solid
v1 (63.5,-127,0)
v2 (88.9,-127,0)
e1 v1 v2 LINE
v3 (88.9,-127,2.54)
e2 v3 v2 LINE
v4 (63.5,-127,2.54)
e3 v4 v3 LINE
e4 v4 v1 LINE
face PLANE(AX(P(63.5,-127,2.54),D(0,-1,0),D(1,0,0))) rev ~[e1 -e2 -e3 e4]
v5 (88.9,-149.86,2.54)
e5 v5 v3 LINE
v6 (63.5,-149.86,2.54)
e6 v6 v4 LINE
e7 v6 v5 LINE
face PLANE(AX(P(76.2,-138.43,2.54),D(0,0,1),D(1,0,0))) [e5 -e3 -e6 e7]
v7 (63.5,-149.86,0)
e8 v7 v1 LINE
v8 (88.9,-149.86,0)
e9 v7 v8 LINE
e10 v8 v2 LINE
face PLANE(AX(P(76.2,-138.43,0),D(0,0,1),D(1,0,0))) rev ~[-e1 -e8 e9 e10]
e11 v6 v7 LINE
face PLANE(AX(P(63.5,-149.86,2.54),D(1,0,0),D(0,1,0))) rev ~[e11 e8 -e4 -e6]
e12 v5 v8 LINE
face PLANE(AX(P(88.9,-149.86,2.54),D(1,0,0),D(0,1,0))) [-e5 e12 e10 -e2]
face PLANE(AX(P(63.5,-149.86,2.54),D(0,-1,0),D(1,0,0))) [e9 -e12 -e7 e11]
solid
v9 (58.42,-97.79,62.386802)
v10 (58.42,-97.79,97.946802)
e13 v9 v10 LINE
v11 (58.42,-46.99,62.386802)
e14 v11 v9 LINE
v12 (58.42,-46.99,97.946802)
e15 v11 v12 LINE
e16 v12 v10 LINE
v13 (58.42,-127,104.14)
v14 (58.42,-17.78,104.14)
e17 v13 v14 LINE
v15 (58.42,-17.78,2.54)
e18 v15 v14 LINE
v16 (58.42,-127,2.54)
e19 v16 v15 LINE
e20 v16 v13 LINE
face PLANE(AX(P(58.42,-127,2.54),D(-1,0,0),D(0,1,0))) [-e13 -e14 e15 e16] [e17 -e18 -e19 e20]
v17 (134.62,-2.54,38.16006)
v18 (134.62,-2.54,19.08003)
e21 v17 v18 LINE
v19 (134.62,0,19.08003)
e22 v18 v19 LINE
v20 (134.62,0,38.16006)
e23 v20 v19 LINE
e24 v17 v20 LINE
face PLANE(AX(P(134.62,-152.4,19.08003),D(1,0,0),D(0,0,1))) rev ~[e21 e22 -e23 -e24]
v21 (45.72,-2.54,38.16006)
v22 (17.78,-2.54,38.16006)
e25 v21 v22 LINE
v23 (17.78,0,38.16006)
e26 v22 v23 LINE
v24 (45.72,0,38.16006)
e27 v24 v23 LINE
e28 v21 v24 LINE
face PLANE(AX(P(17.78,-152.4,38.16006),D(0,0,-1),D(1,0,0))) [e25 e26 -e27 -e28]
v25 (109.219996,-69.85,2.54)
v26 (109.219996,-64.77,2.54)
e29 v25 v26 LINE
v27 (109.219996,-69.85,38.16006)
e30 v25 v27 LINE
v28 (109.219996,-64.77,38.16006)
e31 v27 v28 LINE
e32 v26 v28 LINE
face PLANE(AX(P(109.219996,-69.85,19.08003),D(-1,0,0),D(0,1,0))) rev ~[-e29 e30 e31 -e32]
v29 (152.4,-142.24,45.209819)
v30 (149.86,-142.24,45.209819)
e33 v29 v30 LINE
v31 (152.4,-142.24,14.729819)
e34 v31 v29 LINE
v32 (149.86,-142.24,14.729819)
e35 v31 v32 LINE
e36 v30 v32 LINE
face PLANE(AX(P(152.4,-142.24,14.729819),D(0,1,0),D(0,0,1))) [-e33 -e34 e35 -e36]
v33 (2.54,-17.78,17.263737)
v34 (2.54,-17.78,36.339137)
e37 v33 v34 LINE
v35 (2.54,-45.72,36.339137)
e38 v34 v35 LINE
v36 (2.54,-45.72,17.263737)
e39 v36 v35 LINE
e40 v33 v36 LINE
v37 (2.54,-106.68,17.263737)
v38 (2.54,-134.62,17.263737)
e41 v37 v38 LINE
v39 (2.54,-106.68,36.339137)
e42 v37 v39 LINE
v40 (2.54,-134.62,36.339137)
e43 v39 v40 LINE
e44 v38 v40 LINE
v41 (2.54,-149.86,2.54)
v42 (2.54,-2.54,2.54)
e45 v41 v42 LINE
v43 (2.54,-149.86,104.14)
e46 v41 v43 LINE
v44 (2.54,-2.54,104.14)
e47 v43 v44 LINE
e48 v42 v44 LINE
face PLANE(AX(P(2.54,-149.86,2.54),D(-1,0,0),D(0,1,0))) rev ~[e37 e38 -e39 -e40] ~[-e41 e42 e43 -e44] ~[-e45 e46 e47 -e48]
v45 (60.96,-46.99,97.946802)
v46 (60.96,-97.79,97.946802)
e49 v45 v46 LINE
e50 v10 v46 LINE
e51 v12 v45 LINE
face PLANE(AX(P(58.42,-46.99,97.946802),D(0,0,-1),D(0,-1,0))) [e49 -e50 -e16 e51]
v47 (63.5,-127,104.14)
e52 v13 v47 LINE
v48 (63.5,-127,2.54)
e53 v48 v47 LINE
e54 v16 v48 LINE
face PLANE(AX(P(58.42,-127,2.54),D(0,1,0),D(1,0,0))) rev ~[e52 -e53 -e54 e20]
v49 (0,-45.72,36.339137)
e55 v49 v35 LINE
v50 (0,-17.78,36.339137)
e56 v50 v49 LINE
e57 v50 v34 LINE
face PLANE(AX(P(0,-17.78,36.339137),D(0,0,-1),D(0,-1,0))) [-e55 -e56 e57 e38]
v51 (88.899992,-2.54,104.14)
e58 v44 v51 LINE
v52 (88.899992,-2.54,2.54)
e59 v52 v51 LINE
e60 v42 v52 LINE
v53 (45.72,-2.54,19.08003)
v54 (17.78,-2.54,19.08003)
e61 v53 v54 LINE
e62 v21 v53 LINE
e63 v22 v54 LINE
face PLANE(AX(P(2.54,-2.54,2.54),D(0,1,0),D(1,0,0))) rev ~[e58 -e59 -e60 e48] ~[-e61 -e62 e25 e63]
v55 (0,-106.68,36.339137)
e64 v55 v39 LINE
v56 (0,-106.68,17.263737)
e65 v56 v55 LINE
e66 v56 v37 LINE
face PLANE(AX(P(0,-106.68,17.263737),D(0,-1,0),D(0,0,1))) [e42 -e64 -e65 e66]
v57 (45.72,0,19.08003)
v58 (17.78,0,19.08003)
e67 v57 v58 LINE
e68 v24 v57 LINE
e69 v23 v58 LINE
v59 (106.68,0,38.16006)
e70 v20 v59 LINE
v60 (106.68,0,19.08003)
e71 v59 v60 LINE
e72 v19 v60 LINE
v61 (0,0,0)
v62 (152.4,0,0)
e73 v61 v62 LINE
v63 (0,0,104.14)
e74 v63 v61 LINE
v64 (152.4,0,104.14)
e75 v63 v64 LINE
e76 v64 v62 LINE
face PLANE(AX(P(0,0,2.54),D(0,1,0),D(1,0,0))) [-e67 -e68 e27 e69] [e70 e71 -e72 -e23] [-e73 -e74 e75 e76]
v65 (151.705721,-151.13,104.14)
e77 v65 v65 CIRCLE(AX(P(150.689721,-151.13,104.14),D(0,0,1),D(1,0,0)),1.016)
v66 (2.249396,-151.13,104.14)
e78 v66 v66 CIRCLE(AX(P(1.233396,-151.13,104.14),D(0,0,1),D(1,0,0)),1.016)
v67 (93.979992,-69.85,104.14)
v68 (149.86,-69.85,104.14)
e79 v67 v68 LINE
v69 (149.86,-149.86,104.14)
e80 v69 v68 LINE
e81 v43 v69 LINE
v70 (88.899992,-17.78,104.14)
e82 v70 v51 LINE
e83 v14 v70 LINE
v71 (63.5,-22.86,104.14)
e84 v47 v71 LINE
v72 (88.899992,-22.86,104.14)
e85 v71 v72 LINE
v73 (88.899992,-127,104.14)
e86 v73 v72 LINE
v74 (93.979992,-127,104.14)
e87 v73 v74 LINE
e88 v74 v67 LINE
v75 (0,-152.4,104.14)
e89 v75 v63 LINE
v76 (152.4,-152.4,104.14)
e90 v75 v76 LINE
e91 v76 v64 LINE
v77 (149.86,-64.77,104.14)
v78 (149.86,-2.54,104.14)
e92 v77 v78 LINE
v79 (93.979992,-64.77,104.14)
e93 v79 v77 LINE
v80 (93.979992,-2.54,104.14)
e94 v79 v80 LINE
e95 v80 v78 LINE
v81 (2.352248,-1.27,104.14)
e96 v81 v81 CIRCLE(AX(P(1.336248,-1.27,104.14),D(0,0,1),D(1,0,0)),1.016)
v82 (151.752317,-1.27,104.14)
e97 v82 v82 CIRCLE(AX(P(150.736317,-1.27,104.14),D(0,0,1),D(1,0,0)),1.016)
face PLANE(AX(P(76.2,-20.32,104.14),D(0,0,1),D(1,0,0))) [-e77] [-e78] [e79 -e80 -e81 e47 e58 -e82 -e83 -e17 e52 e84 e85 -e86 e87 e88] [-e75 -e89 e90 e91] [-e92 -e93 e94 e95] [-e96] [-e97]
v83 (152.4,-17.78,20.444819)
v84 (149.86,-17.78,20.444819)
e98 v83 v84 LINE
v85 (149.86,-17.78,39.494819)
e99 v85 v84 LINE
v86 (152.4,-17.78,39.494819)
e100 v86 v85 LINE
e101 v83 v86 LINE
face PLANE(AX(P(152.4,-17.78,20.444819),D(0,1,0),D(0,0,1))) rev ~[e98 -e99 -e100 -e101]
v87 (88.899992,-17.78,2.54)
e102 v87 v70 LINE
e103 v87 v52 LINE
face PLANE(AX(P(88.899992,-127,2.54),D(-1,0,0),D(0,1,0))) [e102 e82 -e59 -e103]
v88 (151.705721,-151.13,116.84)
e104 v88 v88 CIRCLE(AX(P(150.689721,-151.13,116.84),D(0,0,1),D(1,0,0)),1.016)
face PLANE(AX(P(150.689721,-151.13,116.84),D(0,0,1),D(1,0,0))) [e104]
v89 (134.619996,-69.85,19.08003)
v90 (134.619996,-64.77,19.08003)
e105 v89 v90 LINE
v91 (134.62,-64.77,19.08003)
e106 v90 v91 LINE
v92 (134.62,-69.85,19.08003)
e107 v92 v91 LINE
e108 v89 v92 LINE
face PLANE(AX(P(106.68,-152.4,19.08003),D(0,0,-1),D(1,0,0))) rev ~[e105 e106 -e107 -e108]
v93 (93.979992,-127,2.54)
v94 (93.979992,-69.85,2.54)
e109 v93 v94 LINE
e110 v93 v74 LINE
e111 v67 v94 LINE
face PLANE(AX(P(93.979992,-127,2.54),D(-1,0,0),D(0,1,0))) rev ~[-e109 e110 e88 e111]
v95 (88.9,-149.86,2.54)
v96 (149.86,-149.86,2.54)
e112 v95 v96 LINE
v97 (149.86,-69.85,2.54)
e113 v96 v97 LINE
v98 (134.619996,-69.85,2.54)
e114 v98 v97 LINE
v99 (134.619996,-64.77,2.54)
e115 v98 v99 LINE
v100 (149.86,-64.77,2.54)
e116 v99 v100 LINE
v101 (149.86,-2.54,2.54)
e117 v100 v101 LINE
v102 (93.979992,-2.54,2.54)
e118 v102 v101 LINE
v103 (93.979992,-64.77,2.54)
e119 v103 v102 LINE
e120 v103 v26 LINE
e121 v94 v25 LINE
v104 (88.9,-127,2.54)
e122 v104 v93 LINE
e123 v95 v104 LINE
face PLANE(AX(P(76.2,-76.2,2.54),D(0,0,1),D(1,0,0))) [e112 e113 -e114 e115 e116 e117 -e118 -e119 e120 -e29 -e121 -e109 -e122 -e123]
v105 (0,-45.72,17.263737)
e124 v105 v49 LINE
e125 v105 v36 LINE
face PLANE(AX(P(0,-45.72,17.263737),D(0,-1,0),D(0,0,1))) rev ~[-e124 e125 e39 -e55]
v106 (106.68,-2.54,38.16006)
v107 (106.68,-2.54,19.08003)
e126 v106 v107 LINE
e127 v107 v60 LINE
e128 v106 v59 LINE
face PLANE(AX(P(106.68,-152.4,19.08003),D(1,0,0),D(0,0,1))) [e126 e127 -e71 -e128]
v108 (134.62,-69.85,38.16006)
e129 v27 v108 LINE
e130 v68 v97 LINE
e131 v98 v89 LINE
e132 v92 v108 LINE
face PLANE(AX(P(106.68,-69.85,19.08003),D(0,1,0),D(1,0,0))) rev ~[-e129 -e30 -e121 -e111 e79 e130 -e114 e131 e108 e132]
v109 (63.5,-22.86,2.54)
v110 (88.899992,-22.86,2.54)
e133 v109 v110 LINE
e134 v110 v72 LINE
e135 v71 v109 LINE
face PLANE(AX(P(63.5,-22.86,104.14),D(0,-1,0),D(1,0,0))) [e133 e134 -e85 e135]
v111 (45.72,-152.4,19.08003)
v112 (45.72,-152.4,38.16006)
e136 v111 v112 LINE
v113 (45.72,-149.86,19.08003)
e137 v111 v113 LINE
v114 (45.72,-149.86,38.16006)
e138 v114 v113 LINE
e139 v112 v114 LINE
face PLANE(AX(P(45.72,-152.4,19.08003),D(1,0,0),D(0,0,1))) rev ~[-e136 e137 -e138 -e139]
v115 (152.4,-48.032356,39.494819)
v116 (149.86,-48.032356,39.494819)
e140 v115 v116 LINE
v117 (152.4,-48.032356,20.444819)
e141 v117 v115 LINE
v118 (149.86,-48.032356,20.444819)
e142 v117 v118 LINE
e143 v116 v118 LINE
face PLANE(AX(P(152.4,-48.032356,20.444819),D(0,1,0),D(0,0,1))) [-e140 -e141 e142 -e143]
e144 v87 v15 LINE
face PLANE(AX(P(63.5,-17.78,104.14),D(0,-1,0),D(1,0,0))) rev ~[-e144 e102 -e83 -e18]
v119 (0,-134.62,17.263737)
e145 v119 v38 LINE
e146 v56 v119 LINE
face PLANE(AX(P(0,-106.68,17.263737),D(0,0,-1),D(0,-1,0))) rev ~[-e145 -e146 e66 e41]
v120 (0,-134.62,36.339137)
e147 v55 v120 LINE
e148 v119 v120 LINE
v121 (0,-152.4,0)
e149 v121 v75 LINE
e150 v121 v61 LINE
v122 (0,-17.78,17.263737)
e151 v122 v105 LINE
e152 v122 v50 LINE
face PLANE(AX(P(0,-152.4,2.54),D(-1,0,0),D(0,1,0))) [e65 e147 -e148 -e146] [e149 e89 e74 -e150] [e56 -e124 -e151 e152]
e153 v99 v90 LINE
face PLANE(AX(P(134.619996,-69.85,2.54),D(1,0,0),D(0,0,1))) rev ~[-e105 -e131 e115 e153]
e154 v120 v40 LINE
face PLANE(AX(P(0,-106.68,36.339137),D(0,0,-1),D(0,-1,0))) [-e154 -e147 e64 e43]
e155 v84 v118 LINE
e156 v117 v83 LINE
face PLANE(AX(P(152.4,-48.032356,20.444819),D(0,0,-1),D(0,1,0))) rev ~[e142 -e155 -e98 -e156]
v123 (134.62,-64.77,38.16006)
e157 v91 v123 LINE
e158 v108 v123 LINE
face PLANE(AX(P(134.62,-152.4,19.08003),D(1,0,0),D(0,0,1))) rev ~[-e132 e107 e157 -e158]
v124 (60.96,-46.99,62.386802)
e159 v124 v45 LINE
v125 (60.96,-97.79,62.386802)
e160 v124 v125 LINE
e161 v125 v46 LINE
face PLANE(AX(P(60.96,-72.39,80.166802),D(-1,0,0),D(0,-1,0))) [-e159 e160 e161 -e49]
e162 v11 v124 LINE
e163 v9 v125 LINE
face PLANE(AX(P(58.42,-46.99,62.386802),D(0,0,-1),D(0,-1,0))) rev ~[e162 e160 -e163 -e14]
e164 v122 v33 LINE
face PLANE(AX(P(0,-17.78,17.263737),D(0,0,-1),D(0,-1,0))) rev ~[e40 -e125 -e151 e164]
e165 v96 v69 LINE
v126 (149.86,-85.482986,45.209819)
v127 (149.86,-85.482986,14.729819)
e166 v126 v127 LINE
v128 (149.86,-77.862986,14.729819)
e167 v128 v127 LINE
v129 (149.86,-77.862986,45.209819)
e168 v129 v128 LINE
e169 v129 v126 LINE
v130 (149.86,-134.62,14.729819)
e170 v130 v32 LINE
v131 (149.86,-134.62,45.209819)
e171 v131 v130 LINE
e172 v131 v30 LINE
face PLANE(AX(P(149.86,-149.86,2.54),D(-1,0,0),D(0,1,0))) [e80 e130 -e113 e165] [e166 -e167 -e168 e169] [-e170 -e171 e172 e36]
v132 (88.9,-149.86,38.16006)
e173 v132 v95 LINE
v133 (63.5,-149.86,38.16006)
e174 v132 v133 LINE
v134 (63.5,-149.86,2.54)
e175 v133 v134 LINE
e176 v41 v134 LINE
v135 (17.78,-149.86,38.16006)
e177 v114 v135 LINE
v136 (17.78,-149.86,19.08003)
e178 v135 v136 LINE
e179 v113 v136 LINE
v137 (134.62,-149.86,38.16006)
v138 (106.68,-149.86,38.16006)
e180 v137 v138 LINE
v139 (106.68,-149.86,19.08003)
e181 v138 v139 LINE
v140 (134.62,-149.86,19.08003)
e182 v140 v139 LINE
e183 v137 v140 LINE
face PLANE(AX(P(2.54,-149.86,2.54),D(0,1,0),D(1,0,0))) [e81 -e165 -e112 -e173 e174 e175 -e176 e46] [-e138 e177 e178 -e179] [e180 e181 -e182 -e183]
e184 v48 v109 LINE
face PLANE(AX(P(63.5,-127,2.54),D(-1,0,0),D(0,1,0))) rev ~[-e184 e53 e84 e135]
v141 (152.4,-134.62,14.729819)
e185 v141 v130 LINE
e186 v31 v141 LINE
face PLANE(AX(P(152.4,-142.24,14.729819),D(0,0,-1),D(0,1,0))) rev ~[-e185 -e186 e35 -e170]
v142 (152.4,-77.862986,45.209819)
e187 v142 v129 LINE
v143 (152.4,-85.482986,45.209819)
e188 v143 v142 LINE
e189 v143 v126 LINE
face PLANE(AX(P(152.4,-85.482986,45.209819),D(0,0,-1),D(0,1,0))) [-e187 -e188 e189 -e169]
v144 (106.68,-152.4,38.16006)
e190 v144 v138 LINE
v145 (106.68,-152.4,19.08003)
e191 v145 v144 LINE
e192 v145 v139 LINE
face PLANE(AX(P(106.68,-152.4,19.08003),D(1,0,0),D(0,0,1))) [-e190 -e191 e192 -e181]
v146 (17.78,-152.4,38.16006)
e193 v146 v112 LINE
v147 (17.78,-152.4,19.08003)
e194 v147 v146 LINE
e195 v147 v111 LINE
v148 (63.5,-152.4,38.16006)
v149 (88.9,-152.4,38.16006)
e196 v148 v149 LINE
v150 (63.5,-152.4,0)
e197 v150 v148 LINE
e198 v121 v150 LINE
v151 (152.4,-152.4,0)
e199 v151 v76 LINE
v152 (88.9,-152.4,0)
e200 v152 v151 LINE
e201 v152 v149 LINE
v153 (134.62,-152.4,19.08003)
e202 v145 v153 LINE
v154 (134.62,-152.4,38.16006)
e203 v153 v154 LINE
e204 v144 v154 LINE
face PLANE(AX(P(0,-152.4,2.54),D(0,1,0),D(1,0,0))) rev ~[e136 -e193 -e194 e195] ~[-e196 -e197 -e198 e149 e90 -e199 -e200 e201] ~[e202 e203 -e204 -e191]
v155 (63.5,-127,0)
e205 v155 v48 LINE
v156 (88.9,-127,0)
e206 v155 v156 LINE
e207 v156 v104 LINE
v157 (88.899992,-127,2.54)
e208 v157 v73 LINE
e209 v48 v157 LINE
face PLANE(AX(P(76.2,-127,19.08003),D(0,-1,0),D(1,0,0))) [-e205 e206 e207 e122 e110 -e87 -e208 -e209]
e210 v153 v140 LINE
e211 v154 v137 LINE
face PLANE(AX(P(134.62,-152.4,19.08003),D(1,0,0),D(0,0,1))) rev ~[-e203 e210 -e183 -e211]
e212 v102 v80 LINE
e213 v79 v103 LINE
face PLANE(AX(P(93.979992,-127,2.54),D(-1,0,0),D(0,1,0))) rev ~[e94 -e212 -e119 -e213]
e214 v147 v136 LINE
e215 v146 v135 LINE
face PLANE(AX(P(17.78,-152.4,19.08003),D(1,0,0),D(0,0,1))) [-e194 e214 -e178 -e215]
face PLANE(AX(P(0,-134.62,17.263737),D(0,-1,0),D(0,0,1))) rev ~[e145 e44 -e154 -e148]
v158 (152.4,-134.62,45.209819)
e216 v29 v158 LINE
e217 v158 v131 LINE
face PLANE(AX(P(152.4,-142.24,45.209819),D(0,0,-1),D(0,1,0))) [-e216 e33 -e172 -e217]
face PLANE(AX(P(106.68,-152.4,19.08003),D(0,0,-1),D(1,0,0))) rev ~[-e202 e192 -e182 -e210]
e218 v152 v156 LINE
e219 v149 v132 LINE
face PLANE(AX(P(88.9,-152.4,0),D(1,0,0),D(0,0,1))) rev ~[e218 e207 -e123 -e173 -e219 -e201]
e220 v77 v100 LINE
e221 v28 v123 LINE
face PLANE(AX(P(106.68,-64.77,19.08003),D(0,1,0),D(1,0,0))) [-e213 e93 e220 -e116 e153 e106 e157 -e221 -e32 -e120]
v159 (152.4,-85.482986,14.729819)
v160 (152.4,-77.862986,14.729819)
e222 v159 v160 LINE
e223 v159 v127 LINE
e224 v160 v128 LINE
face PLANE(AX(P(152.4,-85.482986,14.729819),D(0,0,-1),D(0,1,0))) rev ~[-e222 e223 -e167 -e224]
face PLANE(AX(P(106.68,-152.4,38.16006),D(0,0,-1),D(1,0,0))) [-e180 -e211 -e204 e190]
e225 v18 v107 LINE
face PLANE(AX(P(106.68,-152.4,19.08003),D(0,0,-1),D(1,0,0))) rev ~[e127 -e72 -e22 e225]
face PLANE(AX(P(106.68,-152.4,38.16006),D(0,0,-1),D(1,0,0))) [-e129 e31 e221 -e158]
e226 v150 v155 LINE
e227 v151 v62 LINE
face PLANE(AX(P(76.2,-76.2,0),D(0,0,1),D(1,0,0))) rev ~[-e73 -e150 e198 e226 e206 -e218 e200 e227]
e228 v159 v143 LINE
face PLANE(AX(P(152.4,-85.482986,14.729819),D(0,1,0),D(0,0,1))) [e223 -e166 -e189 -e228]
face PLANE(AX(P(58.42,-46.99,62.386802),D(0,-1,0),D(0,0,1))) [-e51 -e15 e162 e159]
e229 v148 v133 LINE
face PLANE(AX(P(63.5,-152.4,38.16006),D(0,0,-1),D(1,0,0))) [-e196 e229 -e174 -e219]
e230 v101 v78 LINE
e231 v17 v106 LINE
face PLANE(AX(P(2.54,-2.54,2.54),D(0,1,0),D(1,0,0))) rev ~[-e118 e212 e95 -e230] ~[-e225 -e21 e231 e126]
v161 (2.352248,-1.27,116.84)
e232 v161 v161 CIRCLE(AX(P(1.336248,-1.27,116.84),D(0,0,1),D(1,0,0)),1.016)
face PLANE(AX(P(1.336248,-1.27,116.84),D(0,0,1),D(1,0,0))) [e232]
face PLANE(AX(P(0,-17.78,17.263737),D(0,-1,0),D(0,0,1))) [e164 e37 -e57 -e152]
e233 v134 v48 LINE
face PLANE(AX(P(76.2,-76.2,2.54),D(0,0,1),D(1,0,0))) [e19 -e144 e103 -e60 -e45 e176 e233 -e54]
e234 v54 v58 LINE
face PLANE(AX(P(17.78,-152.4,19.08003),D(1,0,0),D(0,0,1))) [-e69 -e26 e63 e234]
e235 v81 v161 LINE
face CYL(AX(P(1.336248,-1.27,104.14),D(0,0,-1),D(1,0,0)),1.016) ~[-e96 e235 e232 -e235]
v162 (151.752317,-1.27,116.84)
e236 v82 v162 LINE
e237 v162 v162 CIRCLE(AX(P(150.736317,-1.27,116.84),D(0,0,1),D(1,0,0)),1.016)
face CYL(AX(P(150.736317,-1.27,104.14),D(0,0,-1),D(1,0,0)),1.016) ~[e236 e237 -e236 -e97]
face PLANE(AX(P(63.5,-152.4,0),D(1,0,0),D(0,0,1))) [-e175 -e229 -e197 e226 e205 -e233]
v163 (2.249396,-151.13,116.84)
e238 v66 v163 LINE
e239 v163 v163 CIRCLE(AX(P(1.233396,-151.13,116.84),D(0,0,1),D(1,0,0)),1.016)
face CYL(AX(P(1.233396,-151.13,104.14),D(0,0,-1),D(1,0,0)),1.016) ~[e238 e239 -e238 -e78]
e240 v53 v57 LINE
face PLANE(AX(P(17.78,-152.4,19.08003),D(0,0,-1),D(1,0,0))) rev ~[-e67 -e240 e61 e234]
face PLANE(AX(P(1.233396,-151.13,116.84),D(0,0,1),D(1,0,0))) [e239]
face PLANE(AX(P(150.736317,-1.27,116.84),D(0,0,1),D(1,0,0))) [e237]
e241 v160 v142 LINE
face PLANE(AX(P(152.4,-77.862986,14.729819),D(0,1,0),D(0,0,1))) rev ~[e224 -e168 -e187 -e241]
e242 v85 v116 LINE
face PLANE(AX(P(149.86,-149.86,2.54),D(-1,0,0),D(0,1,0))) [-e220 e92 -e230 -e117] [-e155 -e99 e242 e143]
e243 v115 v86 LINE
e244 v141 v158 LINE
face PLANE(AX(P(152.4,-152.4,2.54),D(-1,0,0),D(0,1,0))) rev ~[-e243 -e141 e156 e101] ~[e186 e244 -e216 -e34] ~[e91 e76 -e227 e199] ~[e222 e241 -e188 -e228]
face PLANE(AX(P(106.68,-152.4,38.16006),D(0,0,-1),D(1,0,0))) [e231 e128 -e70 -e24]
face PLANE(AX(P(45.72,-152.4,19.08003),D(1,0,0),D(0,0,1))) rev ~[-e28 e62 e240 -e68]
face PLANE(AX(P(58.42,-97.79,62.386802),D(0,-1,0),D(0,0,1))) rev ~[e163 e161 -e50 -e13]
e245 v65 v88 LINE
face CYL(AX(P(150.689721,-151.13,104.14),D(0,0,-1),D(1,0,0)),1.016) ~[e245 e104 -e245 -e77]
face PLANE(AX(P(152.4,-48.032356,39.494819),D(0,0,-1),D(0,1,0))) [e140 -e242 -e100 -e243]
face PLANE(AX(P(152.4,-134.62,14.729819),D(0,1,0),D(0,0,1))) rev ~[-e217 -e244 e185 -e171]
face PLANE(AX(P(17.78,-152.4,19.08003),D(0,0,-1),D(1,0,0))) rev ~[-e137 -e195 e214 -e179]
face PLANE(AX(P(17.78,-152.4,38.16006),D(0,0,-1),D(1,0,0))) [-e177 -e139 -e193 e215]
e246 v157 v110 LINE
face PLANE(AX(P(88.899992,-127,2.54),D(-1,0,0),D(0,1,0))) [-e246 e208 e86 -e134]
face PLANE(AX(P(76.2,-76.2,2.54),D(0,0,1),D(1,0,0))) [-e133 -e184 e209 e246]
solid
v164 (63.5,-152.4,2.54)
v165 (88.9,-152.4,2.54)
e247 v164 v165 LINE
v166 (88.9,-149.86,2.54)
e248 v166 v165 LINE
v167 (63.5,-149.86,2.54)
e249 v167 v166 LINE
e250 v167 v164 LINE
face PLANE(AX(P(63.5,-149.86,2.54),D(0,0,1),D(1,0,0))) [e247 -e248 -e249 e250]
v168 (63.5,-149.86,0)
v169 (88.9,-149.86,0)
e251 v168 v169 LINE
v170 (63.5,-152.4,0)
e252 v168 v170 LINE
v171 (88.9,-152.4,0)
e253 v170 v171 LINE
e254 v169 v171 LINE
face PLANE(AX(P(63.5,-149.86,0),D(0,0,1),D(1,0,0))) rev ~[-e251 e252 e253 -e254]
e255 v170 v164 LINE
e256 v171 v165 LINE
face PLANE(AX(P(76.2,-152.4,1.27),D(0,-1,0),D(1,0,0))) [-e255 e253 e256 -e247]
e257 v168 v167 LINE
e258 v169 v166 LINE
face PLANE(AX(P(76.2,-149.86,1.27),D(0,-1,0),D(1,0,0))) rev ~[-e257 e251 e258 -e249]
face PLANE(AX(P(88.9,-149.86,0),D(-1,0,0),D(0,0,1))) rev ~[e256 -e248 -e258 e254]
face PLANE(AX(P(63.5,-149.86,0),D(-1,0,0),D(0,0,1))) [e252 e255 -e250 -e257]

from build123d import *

# Parameters (mm, degrees)
F0_W      = 152.4
F0_H      = 152.4
F1_DEPTH  = 2.54
F2_W      = 152.4
F2_H      = 152.4
F2_W_2    = 147.32
F2_H_2    = 147.32
F3_DEPTH  = 101.6
F4_W      = 25.4
F4_H      = 38.1600596011
F5_DEPTH  = 25.4
F6_W      = 25.4
F6_H      = 22.86
F7_DEPTH  = 2.54
F8_W      = 25.4
F8_H      = 2.54
F9_DEPTH  = 2.54
F11_W     = 5.08
F11_H     = 109.22
F11_H_2   = 124.4600435235
F12_DEPTH = 101.6
F13_W     = 25.4
F13_H     = 5.08
F14_DEPTH = 101.6
F15_W     = 50.8
F15_H     = 35.56
F16_DEPTH = 2.54
F17_W     = 55.8800075936
F17_H     = 5.08
F18_DEPTH = 101.6
F20_DEPTH = 5.08
F22_W     = 7.62
F22_H     = 30.48
F23_DEPTH = 25.4
F24_W     = 30.2523560822
F24_H     = 19.05
F25_DEPTH = 25.4
F21_W     = 27.94
F21_H     = 19.0800298005
F26_DEPTH = 254
F27_DEPTH = 254
F28_W     = 2.5399962032
F28_H     = 5.08
F29_DEPTH = 25.4
F30_W     = 27.94
F30_H     = 19.0754
F31_DEPTH = 25.4
F34_R     = 1.016
F35_DEPTH = 12.7


with BuildPart() as f1:
    # F0 (on Top) → F1 (new body)
    with BuildSketch(Plane.XY):
        with Locations((76.2, -76.2)):
            Rectangle(F0_W, F0_H)
    extrude(amount=F1_DEPTH)

    # F2 (on face) → F3 (join)
    with BuildSketch(Plane.XY.offset(2.54)):
        with Locations((76.2, -76.2)):
            Rectangle(F2_W, F2_H)
        with Locations((76.2, -76.2)):
            Rectangle(F2_W_2, F2_H_2, mode=Mode.SUBTRACT)
    extrude(amount=F3_DEPTH)

    # F4 (on face) → F5 (cut)
    with BuildSketch(Plane.XZ.offset(152.4)):
        with Locations((76.2, 19.0800298005)):
            Rectangle(F4_W, F4_H)
    extrude(amount=-F5_DEPTH, mode=Mode.SUBTRACT)

    # F11 (on face) → F12 (join)
    with BuildSketch(Plane.XY.offset(2.54)):
        with Locations((60.96, -72.39)):
            Rectangle(F11_W, F11_H)
        with Locations((91.4399924064, -64.7699782383)):
            Rectangle(F11_W, F11_H_2)
    extrude(amount=F12_DEPTH)

    # F13 (on face) → F14 (join)
    with BuildSketch(Plane.XY.offset(104.14)):
        with Locations((76.2, -20.32)):
            Rectangle(F13_W, F13_H)
    extrude(amount=-F14_DEPTH)

    # F15 (on face) → F16 (cut)
    with BuildSketch(Plane(origin=(58.42, 0, 0), x_dir=(0, -1, 0), z_dir=(-1, 0, 0))):
        with Locations((72.39, 80.1668018103)):
            Rectangle(F15_W, F15_H)
    extrude(amount=-F16_DEPTH, mode=Mode.SUBTRACT)

    # F17 (on face) → F18 (join)
    with BuildSketch(Plane.XY.offset(104.14)):
        with Locations((121.9199962032, -67.31)):
            Rectangle(F17_W, F17_H)
    extrude(amount=-F18_DEPTH)

    # F19 (on face) → F20 (cut)
    with BuildSketch(Plane.XZ.offset(69.85)):
        Polygon((109.2199962032, 2.54), (121.9199962032, 2.54), (134.6199962032, 2.54), (134.6199962032, 38.1), (109.2199962032, 38.1), align=None)
    extrude(amount=-F20_DEPTH, mode=Mode.SUBTRACT)

    # F22 (on face) → F23 (cut)
    with BuildSketch(Plane.YZ.offset(152.4)):
        with Locations((-138.43, 29.9698188901)):
            Rectangle(F22_W, F22_H)
        with Locations((-81.6729860806, 29.9698188901)):
            Rectangle(F22_W, F22_H)
    extrude(amount=-F23_DEPTH, mode=Mode.SUBTRACT)

    # F24 (on face) → F25 (cut)
    with BuildSketch(Plane.YZ.offset(152.4)):
        with Locations((-32.9061780411, 29.9698188901)):
            Rectangle(F24_W, F24_H)
    extrude(amount=-F25_DEPTH, mode=Mode.SUBTRACT)

    # F21 (on face) → F26 (cut)
    with BuildSketch(Plane.XZ.offset(152.4)):
        with Locations((31.75, 28.6200447008)):
            Rectangle(F21_W, F21_H)
    extrude(amount=-F26_DEPTH, mode=Mode.SUBTRACT)

    # F21 (on face) → F27 (cut)
    with BuildSketch(Plane.XZ.offset(152.4)):
        with Locations((120.65, 28.6200447008)):
            Rectangle(F21_W, F21_H)
    extrude(amount=-F27_DEPTH, mode=Mode.SUBTRACT)

    # F28 (on face) → F29 (join)
    with BuildSketch(Plane.XY.offset(19.0800298005)):
        with Locations((107.9499981016, -67.31)):
            Rectangle(F28_W, F28_H)
    extrude(amount=F29_DEPTH)

    # F30 (on face) → F31 (cut)
    with BuildSketch(Plane(origin=(0, 0, 0), x_dir=(0, -1, 0), z_dir=(-1, 0, 0))):
        with Locations((120.65, 26.8014365758)):
            Rectangle(F30_W, F30_H)
        with Locations((31.75, 26.8014365758)):
            Rectangle(F30_W, F30_H)
    extrude(amount=-F31_DEPTH, mode=Mode.SUBTRACT)

    # F34 (on face) → F35 (join)
    with BuildSketch(Plane.XY.offset(104.14)):
        with Locations((1.2333957711, -151.13)):
            Circle(F34_R)
        with Locations((1.3362482423, -1.27)):
            Circle(F34_R)
        with Locations((150.7363170385, -1.27)):
            Circle(F34_R)
        with Locations((150.6897211075, -151.13)):
            Circle(F34_R)
    extrude(amount=F35_DEPTH)


with BuildPart() as f7:
    # F6 (on face) → F7 (new body)
    with BuildSketch(Plane.XY.offset(2.54)):
        with Locations((76.2, -138.43)):
            Rectangle(F6_W, F6_H)
    extrude(amount=-F7_DEPTH)


with BuildPart() as f9:
    # F8 (on face) → F9 (new body)
    with BuildSketch(Plane.XZ.offset(149.86)):
        with Locations((76.2, 1.27)):
            Rectangle(F8_W, F8_H)
    extrude(amount=F9_DEPTH)


solid = Compound([f1.part, f7.part, f9.part])
